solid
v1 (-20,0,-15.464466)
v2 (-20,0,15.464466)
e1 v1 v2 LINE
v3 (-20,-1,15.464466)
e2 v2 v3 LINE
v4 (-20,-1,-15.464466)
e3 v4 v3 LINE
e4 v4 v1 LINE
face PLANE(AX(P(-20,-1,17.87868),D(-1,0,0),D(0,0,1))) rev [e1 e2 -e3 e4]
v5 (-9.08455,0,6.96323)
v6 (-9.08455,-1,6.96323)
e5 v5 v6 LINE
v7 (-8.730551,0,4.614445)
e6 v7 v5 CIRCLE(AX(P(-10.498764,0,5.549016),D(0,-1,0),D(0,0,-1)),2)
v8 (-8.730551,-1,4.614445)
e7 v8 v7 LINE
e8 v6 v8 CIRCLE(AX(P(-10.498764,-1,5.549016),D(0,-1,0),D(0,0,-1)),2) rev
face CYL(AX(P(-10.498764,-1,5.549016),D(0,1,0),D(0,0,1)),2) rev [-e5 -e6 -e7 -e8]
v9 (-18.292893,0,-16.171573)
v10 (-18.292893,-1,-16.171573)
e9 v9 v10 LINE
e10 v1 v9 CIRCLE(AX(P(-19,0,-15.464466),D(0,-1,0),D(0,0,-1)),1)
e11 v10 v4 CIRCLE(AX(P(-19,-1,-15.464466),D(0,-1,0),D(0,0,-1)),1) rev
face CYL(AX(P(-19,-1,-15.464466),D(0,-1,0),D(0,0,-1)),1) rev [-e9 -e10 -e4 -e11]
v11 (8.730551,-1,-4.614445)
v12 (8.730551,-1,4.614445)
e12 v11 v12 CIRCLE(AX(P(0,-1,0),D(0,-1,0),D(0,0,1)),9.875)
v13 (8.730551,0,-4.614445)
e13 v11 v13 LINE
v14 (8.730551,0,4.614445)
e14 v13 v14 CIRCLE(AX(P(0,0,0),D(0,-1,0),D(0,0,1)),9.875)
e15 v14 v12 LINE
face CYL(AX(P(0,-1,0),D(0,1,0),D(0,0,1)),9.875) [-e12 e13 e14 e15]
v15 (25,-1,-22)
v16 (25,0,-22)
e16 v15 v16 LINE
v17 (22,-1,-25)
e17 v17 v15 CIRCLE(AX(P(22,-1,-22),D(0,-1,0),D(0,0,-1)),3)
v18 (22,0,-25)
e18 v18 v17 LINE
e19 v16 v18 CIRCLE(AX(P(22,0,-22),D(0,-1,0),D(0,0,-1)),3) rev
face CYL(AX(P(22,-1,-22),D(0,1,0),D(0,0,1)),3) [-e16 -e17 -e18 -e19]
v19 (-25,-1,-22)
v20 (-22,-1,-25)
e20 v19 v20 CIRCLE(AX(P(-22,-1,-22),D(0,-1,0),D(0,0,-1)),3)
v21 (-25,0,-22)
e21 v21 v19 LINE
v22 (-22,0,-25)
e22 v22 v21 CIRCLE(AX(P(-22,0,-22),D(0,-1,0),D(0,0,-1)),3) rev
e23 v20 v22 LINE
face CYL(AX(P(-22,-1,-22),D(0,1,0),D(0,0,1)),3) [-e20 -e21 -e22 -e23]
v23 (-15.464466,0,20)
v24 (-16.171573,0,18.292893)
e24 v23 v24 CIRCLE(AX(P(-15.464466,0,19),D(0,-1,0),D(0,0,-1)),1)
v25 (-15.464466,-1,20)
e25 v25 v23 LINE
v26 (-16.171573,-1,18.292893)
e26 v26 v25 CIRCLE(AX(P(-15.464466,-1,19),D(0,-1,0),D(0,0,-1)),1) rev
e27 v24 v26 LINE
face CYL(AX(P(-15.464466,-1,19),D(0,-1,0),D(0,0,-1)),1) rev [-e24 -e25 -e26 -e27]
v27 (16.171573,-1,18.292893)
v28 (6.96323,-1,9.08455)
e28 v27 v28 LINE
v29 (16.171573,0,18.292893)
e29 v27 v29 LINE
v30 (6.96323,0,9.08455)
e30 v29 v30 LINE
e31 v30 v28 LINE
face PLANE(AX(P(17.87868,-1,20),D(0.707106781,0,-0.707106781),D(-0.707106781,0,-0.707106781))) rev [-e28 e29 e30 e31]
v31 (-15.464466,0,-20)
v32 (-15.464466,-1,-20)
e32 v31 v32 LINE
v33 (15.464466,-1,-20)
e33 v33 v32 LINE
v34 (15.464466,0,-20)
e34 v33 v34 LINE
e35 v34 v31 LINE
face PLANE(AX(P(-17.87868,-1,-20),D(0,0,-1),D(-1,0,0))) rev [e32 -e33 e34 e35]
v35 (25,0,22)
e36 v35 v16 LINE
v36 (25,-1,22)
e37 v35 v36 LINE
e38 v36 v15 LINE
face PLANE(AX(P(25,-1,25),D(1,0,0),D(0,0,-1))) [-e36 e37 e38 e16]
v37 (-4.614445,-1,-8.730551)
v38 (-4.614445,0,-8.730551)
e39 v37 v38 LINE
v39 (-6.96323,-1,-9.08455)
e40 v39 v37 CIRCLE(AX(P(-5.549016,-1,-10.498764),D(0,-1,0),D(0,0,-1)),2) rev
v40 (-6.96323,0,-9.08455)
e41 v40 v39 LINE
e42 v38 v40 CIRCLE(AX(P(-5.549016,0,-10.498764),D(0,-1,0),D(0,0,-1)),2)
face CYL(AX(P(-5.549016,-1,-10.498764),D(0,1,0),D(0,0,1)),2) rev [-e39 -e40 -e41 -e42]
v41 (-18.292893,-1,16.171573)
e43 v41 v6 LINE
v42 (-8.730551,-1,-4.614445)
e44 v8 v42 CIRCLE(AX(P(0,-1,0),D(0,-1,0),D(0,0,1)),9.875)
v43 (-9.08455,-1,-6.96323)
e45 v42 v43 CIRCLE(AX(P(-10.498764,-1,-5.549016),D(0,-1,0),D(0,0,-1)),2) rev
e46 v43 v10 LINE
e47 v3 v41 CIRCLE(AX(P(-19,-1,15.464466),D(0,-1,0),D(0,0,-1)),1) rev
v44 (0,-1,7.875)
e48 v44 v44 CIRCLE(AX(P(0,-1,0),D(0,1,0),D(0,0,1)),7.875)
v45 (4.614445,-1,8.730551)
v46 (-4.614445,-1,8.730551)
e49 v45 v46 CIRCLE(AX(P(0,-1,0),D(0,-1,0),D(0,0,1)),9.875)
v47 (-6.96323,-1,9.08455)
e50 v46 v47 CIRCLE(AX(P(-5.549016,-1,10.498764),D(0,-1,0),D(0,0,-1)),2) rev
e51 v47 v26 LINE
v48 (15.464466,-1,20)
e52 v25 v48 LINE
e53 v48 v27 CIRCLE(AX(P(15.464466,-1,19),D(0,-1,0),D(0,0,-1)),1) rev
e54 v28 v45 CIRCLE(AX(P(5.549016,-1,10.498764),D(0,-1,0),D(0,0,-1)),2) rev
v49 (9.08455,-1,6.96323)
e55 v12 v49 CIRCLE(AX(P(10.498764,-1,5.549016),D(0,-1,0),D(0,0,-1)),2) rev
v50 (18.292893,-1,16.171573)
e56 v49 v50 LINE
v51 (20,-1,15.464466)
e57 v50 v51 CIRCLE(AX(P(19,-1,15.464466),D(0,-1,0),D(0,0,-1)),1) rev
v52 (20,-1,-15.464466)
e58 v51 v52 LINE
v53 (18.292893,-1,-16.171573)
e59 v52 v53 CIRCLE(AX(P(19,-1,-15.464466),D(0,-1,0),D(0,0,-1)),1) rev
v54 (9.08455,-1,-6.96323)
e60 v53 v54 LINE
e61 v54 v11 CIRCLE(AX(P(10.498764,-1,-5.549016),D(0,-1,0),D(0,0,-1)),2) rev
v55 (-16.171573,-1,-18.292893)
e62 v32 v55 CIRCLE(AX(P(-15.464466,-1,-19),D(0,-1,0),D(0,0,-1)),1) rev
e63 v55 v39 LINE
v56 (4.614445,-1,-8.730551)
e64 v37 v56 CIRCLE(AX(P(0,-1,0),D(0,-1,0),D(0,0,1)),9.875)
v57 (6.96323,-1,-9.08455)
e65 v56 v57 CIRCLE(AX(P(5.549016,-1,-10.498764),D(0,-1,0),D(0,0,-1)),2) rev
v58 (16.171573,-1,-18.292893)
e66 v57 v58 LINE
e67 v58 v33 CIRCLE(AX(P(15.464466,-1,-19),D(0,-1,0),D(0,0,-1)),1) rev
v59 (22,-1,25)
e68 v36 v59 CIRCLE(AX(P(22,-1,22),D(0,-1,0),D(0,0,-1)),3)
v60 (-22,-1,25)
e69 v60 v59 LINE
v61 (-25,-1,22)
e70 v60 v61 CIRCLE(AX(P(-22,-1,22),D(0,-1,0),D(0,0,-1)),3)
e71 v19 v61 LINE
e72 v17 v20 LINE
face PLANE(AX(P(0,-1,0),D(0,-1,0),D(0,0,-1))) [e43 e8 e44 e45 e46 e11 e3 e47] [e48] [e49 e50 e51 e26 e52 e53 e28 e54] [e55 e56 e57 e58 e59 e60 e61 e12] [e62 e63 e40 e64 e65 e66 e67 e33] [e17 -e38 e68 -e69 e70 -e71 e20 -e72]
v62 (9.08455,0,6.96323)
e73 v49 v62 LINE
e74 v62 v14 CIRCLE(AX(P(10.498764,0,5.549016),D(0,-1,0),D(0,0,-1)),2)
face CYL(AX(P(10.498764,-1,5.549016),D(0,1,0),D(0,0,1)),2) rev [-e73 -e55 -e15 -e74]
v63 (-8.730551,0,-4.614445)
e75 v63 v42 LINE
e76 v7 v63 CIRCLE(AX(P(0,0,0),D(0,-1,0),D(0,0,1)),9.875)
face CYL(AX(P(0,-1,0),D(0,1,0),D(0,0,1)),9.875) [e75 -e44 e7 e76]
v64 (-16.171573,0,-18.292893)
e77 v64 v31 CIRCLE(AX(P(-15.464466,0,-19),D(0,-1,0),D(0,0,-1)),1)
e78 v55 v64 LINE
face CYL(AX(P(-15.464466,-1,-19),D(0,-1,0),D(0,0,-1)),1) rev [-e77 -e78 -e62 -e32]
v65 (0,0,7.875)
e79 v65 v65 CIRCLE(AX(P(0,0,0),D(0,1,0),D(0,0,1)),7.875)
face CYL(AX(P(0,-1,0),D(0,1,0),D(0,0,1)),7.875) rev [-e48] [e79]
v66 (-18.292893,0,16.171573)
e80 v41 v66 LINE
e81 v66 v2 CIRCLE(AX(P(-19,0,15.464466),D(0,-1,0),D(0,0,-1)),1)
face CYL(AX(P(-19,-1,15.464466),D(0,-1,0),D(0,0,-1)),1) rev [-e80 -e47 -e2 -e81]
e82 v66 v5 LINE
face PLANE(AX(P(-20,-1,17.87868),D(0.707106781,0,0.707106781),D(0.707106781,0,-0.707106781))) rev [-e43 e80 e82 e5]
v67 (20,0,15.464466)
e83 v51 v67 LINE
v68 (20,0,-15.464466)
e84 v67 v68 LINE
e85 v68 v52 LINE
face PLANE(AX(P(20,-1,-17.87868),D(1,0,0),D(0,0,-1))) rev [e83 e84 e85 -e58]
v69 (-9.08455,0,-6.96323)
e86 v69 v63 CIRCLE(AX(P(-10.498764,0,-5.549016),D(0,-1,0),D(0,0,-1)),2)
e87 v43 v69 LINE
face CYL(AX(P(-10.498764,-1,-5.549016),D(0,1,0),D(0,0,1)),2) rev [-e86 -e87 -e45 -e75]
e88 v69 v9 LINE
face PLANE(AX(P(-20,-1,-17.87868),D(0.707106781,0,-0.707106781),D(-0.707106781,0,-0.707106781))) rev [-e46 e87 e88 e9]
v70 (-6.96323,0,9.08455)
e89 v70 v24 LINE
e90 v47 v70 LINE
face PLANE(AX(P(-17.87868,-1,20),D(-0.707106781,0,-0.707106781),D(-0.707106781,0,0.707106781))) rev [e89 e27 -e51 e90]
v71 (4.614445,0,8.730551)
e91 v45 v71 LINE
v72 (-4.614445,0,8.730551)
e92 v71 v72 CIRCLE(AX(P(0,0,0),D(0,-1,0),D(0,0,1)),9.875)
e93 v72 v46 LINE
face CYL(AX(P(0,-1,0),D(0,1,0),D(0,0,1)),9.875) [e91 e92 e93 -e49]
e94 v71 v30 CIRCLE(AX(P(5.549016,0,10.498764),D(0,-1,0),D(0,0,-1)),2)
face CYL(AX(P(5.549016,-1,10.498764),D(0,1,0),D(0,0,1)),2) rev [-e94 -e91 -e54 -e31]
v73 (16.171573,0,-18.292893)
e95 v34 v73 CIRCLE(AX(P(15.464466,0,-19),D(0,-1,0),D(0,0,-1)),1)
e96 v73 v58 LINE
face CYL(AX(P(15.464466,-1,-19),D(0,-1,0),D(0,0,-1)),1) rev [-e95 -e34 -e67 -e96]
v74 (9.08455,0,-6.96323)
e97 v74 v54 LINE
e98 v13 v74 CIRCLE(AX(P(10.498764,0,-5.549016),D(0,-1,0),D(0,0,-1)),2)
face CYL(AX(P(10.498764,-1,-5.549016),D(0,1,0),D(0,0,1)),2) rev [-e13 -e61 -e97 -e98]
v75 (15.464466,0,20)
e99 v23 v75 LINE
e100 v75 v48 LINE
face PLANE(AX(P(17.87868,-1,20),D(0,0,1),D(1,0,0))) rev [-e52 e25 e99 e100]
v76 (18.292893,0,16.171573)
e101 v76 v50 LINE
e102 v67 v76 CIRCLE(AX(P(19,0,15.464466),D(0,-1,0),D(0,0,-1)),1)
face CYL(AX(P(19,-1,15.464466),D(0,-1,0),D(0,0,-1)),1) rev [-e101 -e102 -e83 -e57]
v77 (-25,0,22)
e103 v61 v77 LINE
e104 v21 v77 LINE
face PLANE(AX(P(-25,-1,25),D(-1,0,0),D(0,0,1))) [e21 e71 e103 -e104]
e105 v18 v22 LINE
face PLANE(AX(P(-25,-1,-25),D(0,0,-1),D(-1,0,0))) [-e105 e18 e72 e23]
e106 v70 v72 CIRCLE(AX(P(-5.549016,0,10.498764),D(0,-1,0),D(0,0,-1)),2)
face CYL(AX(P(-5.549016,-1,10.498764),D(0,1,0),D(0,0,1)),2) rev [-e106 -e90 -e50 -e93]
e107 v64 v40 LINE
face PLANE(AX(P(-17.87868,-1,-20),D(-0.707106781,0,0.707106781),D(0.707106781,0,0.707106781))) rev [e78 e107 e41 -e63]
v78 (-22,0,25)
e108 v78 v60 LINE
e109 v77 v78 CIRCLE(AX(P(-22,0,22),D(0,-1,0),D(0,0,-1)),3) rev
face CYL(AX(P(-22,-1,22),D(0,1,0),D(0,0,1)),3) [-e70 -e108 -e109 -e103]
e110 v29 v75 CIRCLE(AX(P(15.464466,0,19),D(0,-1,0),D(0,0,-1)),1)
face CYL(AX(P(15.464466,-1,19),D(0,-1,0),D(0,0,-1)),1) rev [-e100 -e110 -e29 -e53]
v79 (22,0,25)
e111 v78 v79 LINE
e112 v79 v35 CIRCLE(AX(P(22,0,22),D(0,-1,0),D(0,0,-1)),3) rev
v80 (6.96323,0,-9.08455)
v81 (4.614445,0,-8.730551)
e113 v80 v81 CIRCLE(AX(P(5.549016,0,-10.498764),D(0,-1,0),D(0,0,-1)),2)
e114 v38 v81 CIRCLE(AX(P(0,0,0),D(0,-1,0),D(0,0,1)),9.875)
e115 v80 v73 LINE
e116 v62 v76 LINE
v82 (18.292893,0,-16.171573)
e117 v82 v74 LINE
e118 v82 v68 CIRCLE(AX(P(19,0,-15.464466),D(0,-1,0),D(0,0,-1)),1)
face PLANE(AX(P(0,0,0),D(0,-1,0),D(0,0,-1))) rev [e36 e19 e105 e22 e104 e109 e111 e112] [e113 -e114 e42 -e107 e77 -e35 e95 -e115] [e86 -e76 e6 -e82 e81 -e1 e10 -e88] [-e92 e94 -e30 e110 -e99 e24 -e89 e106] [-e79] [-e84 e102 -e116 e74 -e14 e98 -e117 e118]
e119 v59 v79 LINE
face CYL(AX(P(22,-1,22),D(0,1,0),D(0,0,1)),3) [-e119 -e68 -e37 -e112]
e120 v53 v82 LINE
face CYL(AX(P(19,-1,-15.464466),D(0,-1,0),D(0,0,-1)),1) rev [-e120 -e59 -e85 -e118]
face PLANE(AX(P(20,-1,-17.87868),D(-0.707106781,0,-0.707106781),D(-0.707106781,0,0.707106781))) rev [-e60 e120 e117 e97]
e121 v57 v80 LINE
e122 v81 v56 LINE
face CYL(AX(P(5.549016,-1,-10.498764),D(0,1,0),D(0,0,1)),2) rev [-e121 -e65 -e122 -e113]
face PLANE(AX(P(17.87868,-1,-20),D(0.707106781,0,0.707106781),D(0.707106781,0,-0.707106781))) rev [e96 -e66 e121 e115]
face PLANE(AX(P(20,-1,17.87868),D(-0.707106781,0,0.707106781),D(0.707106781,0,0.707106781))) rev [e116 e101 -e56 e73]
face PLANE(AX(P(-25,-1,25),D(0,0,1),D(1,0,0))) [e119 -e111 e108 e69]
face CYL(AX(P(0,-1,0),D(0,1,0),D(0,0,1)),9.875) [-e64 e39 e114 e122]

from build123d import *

# Parameters (mm, degrees)
SKETCH1_W          = 50
SKETCH1_H          = 50
SKETCH1_R          = 7.875
BASE_FLANGE1_DEPTH = 1
FILLET1_R          = 3
FILLET2_R          = 1
FILLET3_R          = 2


# Sheet-metal steps are written as plain solids
with BuildPart() as part:
    # Sketch1 → Base-Flange1 (new body)
    with BuildSketch(Plane(origin=(0, 0, 0), x_dir=(1, 0, 0), z_dir=(0, 1, 0))):
        Rectangle(SKETCH1_W, SKETCH1_H)
        with Locations(Location((0, 0, 0), (0, 0, 270))):
            Circle(SKETCH1_R, mode=Mode.SUBTRACT)
        with BuildLine():
            Line((20, 17.878679656), (20, -17.878679656))
            Line((20, -17.878679656), (7.962313054, -5.84099271))
            ThreePointArc((7.962313054, -5.84099271), (9.875, 0), (7.962313054, 5.84099271))
            Line((7.962313054, 5.84099271), (20, 17.878679656))
        make_face(mode=Mode.SUBTRACT)
        with BuildLine():
            Line((17.878679656, -20), (-17.878679656, -20))
            Line((-17.878679656, -20), (-5.84099271, -7.962313054))
            ThreePointArc((-5.84099271, -7.962313054), (0, -9.875), (5.84099271, -7.962313054))
            Line((5.84099271, -7.962313054), (17.878679656, -20))
        make_face(mode=Mode.SUBTRACT)
        with BuildLine():
            Line((-20, -17.878679656), (-20, 17.878679656))
            Line((-20, 17.878679656), (-7.962313054, 5.84099271))
            ThreePointArc((-7.962313054, 5.84099271), (-9.875, 0), (-7.962313054, -5.84099271))
            Line((-7.962313054, -5.84099271), (-20, -17.878679656))
        make_face(mode=Mode.SUBTRACT)
        with BuildLine():
            Line((-17.878679656, 20), (17.878679656, 20))
            Line((17.878679656, 20), (5.84099271, 7.962313054))
            ThreePointArc((5.84099271, 7.962313054), (0, 9.875), (-5.84099271, 7.962313054))
            Line((-5.84099271, 7.962313054), (-17.878679656, 20))
        make_face(mode=Mode.SUBTRACT)
    extrude(amount=-BASE_FLANGE1_DEPTH)

    # Fillet1
    fillet1_edges = [part.edges().sort_by_distance(p)[0] for p in [
        (25, -0.5, 25),
        (-25, -0.5, 25),
        (-25, -0.5, -25),
        (25, -0.5, -25),
    ]]
    fillet(fillet1_edges, radius=FILLET1_R)

    # Fillet2
    fillet2_edges = [part.edges().sort_by_distance(p)[0] for p in [
        (17.878679656, -0.5, 20),
        (-17.878679656, -0.5, 20),
        (20, -0.5, -17.878679656),
        (20, -0.5, 17.878679656),
        (17.878679656, -0.5, -20),
        (-17.878679656, -0.5, -20),
        (-20, -0.5, -17.878679656),
        (-20, -0.5, 17.878679656),
    ]]
    fillet(fillet2_edges, radius=FILLET2_R)

    # Fillet3
    fillet3_edges = [part.edges().sort_by_distance(p)[0] for p in [
        (-5.84099271, -0.5, 7.962313054),
        (5.84099271, -0.5, 7.962313054),
        (7.962313054, -0.5, -5.84099271),
        (7.962313054, -0.5, 5.84099271),
        (5.84099271, -0.5, -7.962313054),
        (-5.84099271, -0.5, -7.962313054),
        (-7.962313054, -0.5, -5.84099271),
        (-7.962313054, -0.5, 5.84099271),
    ]]
    fillet(fillet3_edges, radius=FILLET3_R)


solid = part.part
